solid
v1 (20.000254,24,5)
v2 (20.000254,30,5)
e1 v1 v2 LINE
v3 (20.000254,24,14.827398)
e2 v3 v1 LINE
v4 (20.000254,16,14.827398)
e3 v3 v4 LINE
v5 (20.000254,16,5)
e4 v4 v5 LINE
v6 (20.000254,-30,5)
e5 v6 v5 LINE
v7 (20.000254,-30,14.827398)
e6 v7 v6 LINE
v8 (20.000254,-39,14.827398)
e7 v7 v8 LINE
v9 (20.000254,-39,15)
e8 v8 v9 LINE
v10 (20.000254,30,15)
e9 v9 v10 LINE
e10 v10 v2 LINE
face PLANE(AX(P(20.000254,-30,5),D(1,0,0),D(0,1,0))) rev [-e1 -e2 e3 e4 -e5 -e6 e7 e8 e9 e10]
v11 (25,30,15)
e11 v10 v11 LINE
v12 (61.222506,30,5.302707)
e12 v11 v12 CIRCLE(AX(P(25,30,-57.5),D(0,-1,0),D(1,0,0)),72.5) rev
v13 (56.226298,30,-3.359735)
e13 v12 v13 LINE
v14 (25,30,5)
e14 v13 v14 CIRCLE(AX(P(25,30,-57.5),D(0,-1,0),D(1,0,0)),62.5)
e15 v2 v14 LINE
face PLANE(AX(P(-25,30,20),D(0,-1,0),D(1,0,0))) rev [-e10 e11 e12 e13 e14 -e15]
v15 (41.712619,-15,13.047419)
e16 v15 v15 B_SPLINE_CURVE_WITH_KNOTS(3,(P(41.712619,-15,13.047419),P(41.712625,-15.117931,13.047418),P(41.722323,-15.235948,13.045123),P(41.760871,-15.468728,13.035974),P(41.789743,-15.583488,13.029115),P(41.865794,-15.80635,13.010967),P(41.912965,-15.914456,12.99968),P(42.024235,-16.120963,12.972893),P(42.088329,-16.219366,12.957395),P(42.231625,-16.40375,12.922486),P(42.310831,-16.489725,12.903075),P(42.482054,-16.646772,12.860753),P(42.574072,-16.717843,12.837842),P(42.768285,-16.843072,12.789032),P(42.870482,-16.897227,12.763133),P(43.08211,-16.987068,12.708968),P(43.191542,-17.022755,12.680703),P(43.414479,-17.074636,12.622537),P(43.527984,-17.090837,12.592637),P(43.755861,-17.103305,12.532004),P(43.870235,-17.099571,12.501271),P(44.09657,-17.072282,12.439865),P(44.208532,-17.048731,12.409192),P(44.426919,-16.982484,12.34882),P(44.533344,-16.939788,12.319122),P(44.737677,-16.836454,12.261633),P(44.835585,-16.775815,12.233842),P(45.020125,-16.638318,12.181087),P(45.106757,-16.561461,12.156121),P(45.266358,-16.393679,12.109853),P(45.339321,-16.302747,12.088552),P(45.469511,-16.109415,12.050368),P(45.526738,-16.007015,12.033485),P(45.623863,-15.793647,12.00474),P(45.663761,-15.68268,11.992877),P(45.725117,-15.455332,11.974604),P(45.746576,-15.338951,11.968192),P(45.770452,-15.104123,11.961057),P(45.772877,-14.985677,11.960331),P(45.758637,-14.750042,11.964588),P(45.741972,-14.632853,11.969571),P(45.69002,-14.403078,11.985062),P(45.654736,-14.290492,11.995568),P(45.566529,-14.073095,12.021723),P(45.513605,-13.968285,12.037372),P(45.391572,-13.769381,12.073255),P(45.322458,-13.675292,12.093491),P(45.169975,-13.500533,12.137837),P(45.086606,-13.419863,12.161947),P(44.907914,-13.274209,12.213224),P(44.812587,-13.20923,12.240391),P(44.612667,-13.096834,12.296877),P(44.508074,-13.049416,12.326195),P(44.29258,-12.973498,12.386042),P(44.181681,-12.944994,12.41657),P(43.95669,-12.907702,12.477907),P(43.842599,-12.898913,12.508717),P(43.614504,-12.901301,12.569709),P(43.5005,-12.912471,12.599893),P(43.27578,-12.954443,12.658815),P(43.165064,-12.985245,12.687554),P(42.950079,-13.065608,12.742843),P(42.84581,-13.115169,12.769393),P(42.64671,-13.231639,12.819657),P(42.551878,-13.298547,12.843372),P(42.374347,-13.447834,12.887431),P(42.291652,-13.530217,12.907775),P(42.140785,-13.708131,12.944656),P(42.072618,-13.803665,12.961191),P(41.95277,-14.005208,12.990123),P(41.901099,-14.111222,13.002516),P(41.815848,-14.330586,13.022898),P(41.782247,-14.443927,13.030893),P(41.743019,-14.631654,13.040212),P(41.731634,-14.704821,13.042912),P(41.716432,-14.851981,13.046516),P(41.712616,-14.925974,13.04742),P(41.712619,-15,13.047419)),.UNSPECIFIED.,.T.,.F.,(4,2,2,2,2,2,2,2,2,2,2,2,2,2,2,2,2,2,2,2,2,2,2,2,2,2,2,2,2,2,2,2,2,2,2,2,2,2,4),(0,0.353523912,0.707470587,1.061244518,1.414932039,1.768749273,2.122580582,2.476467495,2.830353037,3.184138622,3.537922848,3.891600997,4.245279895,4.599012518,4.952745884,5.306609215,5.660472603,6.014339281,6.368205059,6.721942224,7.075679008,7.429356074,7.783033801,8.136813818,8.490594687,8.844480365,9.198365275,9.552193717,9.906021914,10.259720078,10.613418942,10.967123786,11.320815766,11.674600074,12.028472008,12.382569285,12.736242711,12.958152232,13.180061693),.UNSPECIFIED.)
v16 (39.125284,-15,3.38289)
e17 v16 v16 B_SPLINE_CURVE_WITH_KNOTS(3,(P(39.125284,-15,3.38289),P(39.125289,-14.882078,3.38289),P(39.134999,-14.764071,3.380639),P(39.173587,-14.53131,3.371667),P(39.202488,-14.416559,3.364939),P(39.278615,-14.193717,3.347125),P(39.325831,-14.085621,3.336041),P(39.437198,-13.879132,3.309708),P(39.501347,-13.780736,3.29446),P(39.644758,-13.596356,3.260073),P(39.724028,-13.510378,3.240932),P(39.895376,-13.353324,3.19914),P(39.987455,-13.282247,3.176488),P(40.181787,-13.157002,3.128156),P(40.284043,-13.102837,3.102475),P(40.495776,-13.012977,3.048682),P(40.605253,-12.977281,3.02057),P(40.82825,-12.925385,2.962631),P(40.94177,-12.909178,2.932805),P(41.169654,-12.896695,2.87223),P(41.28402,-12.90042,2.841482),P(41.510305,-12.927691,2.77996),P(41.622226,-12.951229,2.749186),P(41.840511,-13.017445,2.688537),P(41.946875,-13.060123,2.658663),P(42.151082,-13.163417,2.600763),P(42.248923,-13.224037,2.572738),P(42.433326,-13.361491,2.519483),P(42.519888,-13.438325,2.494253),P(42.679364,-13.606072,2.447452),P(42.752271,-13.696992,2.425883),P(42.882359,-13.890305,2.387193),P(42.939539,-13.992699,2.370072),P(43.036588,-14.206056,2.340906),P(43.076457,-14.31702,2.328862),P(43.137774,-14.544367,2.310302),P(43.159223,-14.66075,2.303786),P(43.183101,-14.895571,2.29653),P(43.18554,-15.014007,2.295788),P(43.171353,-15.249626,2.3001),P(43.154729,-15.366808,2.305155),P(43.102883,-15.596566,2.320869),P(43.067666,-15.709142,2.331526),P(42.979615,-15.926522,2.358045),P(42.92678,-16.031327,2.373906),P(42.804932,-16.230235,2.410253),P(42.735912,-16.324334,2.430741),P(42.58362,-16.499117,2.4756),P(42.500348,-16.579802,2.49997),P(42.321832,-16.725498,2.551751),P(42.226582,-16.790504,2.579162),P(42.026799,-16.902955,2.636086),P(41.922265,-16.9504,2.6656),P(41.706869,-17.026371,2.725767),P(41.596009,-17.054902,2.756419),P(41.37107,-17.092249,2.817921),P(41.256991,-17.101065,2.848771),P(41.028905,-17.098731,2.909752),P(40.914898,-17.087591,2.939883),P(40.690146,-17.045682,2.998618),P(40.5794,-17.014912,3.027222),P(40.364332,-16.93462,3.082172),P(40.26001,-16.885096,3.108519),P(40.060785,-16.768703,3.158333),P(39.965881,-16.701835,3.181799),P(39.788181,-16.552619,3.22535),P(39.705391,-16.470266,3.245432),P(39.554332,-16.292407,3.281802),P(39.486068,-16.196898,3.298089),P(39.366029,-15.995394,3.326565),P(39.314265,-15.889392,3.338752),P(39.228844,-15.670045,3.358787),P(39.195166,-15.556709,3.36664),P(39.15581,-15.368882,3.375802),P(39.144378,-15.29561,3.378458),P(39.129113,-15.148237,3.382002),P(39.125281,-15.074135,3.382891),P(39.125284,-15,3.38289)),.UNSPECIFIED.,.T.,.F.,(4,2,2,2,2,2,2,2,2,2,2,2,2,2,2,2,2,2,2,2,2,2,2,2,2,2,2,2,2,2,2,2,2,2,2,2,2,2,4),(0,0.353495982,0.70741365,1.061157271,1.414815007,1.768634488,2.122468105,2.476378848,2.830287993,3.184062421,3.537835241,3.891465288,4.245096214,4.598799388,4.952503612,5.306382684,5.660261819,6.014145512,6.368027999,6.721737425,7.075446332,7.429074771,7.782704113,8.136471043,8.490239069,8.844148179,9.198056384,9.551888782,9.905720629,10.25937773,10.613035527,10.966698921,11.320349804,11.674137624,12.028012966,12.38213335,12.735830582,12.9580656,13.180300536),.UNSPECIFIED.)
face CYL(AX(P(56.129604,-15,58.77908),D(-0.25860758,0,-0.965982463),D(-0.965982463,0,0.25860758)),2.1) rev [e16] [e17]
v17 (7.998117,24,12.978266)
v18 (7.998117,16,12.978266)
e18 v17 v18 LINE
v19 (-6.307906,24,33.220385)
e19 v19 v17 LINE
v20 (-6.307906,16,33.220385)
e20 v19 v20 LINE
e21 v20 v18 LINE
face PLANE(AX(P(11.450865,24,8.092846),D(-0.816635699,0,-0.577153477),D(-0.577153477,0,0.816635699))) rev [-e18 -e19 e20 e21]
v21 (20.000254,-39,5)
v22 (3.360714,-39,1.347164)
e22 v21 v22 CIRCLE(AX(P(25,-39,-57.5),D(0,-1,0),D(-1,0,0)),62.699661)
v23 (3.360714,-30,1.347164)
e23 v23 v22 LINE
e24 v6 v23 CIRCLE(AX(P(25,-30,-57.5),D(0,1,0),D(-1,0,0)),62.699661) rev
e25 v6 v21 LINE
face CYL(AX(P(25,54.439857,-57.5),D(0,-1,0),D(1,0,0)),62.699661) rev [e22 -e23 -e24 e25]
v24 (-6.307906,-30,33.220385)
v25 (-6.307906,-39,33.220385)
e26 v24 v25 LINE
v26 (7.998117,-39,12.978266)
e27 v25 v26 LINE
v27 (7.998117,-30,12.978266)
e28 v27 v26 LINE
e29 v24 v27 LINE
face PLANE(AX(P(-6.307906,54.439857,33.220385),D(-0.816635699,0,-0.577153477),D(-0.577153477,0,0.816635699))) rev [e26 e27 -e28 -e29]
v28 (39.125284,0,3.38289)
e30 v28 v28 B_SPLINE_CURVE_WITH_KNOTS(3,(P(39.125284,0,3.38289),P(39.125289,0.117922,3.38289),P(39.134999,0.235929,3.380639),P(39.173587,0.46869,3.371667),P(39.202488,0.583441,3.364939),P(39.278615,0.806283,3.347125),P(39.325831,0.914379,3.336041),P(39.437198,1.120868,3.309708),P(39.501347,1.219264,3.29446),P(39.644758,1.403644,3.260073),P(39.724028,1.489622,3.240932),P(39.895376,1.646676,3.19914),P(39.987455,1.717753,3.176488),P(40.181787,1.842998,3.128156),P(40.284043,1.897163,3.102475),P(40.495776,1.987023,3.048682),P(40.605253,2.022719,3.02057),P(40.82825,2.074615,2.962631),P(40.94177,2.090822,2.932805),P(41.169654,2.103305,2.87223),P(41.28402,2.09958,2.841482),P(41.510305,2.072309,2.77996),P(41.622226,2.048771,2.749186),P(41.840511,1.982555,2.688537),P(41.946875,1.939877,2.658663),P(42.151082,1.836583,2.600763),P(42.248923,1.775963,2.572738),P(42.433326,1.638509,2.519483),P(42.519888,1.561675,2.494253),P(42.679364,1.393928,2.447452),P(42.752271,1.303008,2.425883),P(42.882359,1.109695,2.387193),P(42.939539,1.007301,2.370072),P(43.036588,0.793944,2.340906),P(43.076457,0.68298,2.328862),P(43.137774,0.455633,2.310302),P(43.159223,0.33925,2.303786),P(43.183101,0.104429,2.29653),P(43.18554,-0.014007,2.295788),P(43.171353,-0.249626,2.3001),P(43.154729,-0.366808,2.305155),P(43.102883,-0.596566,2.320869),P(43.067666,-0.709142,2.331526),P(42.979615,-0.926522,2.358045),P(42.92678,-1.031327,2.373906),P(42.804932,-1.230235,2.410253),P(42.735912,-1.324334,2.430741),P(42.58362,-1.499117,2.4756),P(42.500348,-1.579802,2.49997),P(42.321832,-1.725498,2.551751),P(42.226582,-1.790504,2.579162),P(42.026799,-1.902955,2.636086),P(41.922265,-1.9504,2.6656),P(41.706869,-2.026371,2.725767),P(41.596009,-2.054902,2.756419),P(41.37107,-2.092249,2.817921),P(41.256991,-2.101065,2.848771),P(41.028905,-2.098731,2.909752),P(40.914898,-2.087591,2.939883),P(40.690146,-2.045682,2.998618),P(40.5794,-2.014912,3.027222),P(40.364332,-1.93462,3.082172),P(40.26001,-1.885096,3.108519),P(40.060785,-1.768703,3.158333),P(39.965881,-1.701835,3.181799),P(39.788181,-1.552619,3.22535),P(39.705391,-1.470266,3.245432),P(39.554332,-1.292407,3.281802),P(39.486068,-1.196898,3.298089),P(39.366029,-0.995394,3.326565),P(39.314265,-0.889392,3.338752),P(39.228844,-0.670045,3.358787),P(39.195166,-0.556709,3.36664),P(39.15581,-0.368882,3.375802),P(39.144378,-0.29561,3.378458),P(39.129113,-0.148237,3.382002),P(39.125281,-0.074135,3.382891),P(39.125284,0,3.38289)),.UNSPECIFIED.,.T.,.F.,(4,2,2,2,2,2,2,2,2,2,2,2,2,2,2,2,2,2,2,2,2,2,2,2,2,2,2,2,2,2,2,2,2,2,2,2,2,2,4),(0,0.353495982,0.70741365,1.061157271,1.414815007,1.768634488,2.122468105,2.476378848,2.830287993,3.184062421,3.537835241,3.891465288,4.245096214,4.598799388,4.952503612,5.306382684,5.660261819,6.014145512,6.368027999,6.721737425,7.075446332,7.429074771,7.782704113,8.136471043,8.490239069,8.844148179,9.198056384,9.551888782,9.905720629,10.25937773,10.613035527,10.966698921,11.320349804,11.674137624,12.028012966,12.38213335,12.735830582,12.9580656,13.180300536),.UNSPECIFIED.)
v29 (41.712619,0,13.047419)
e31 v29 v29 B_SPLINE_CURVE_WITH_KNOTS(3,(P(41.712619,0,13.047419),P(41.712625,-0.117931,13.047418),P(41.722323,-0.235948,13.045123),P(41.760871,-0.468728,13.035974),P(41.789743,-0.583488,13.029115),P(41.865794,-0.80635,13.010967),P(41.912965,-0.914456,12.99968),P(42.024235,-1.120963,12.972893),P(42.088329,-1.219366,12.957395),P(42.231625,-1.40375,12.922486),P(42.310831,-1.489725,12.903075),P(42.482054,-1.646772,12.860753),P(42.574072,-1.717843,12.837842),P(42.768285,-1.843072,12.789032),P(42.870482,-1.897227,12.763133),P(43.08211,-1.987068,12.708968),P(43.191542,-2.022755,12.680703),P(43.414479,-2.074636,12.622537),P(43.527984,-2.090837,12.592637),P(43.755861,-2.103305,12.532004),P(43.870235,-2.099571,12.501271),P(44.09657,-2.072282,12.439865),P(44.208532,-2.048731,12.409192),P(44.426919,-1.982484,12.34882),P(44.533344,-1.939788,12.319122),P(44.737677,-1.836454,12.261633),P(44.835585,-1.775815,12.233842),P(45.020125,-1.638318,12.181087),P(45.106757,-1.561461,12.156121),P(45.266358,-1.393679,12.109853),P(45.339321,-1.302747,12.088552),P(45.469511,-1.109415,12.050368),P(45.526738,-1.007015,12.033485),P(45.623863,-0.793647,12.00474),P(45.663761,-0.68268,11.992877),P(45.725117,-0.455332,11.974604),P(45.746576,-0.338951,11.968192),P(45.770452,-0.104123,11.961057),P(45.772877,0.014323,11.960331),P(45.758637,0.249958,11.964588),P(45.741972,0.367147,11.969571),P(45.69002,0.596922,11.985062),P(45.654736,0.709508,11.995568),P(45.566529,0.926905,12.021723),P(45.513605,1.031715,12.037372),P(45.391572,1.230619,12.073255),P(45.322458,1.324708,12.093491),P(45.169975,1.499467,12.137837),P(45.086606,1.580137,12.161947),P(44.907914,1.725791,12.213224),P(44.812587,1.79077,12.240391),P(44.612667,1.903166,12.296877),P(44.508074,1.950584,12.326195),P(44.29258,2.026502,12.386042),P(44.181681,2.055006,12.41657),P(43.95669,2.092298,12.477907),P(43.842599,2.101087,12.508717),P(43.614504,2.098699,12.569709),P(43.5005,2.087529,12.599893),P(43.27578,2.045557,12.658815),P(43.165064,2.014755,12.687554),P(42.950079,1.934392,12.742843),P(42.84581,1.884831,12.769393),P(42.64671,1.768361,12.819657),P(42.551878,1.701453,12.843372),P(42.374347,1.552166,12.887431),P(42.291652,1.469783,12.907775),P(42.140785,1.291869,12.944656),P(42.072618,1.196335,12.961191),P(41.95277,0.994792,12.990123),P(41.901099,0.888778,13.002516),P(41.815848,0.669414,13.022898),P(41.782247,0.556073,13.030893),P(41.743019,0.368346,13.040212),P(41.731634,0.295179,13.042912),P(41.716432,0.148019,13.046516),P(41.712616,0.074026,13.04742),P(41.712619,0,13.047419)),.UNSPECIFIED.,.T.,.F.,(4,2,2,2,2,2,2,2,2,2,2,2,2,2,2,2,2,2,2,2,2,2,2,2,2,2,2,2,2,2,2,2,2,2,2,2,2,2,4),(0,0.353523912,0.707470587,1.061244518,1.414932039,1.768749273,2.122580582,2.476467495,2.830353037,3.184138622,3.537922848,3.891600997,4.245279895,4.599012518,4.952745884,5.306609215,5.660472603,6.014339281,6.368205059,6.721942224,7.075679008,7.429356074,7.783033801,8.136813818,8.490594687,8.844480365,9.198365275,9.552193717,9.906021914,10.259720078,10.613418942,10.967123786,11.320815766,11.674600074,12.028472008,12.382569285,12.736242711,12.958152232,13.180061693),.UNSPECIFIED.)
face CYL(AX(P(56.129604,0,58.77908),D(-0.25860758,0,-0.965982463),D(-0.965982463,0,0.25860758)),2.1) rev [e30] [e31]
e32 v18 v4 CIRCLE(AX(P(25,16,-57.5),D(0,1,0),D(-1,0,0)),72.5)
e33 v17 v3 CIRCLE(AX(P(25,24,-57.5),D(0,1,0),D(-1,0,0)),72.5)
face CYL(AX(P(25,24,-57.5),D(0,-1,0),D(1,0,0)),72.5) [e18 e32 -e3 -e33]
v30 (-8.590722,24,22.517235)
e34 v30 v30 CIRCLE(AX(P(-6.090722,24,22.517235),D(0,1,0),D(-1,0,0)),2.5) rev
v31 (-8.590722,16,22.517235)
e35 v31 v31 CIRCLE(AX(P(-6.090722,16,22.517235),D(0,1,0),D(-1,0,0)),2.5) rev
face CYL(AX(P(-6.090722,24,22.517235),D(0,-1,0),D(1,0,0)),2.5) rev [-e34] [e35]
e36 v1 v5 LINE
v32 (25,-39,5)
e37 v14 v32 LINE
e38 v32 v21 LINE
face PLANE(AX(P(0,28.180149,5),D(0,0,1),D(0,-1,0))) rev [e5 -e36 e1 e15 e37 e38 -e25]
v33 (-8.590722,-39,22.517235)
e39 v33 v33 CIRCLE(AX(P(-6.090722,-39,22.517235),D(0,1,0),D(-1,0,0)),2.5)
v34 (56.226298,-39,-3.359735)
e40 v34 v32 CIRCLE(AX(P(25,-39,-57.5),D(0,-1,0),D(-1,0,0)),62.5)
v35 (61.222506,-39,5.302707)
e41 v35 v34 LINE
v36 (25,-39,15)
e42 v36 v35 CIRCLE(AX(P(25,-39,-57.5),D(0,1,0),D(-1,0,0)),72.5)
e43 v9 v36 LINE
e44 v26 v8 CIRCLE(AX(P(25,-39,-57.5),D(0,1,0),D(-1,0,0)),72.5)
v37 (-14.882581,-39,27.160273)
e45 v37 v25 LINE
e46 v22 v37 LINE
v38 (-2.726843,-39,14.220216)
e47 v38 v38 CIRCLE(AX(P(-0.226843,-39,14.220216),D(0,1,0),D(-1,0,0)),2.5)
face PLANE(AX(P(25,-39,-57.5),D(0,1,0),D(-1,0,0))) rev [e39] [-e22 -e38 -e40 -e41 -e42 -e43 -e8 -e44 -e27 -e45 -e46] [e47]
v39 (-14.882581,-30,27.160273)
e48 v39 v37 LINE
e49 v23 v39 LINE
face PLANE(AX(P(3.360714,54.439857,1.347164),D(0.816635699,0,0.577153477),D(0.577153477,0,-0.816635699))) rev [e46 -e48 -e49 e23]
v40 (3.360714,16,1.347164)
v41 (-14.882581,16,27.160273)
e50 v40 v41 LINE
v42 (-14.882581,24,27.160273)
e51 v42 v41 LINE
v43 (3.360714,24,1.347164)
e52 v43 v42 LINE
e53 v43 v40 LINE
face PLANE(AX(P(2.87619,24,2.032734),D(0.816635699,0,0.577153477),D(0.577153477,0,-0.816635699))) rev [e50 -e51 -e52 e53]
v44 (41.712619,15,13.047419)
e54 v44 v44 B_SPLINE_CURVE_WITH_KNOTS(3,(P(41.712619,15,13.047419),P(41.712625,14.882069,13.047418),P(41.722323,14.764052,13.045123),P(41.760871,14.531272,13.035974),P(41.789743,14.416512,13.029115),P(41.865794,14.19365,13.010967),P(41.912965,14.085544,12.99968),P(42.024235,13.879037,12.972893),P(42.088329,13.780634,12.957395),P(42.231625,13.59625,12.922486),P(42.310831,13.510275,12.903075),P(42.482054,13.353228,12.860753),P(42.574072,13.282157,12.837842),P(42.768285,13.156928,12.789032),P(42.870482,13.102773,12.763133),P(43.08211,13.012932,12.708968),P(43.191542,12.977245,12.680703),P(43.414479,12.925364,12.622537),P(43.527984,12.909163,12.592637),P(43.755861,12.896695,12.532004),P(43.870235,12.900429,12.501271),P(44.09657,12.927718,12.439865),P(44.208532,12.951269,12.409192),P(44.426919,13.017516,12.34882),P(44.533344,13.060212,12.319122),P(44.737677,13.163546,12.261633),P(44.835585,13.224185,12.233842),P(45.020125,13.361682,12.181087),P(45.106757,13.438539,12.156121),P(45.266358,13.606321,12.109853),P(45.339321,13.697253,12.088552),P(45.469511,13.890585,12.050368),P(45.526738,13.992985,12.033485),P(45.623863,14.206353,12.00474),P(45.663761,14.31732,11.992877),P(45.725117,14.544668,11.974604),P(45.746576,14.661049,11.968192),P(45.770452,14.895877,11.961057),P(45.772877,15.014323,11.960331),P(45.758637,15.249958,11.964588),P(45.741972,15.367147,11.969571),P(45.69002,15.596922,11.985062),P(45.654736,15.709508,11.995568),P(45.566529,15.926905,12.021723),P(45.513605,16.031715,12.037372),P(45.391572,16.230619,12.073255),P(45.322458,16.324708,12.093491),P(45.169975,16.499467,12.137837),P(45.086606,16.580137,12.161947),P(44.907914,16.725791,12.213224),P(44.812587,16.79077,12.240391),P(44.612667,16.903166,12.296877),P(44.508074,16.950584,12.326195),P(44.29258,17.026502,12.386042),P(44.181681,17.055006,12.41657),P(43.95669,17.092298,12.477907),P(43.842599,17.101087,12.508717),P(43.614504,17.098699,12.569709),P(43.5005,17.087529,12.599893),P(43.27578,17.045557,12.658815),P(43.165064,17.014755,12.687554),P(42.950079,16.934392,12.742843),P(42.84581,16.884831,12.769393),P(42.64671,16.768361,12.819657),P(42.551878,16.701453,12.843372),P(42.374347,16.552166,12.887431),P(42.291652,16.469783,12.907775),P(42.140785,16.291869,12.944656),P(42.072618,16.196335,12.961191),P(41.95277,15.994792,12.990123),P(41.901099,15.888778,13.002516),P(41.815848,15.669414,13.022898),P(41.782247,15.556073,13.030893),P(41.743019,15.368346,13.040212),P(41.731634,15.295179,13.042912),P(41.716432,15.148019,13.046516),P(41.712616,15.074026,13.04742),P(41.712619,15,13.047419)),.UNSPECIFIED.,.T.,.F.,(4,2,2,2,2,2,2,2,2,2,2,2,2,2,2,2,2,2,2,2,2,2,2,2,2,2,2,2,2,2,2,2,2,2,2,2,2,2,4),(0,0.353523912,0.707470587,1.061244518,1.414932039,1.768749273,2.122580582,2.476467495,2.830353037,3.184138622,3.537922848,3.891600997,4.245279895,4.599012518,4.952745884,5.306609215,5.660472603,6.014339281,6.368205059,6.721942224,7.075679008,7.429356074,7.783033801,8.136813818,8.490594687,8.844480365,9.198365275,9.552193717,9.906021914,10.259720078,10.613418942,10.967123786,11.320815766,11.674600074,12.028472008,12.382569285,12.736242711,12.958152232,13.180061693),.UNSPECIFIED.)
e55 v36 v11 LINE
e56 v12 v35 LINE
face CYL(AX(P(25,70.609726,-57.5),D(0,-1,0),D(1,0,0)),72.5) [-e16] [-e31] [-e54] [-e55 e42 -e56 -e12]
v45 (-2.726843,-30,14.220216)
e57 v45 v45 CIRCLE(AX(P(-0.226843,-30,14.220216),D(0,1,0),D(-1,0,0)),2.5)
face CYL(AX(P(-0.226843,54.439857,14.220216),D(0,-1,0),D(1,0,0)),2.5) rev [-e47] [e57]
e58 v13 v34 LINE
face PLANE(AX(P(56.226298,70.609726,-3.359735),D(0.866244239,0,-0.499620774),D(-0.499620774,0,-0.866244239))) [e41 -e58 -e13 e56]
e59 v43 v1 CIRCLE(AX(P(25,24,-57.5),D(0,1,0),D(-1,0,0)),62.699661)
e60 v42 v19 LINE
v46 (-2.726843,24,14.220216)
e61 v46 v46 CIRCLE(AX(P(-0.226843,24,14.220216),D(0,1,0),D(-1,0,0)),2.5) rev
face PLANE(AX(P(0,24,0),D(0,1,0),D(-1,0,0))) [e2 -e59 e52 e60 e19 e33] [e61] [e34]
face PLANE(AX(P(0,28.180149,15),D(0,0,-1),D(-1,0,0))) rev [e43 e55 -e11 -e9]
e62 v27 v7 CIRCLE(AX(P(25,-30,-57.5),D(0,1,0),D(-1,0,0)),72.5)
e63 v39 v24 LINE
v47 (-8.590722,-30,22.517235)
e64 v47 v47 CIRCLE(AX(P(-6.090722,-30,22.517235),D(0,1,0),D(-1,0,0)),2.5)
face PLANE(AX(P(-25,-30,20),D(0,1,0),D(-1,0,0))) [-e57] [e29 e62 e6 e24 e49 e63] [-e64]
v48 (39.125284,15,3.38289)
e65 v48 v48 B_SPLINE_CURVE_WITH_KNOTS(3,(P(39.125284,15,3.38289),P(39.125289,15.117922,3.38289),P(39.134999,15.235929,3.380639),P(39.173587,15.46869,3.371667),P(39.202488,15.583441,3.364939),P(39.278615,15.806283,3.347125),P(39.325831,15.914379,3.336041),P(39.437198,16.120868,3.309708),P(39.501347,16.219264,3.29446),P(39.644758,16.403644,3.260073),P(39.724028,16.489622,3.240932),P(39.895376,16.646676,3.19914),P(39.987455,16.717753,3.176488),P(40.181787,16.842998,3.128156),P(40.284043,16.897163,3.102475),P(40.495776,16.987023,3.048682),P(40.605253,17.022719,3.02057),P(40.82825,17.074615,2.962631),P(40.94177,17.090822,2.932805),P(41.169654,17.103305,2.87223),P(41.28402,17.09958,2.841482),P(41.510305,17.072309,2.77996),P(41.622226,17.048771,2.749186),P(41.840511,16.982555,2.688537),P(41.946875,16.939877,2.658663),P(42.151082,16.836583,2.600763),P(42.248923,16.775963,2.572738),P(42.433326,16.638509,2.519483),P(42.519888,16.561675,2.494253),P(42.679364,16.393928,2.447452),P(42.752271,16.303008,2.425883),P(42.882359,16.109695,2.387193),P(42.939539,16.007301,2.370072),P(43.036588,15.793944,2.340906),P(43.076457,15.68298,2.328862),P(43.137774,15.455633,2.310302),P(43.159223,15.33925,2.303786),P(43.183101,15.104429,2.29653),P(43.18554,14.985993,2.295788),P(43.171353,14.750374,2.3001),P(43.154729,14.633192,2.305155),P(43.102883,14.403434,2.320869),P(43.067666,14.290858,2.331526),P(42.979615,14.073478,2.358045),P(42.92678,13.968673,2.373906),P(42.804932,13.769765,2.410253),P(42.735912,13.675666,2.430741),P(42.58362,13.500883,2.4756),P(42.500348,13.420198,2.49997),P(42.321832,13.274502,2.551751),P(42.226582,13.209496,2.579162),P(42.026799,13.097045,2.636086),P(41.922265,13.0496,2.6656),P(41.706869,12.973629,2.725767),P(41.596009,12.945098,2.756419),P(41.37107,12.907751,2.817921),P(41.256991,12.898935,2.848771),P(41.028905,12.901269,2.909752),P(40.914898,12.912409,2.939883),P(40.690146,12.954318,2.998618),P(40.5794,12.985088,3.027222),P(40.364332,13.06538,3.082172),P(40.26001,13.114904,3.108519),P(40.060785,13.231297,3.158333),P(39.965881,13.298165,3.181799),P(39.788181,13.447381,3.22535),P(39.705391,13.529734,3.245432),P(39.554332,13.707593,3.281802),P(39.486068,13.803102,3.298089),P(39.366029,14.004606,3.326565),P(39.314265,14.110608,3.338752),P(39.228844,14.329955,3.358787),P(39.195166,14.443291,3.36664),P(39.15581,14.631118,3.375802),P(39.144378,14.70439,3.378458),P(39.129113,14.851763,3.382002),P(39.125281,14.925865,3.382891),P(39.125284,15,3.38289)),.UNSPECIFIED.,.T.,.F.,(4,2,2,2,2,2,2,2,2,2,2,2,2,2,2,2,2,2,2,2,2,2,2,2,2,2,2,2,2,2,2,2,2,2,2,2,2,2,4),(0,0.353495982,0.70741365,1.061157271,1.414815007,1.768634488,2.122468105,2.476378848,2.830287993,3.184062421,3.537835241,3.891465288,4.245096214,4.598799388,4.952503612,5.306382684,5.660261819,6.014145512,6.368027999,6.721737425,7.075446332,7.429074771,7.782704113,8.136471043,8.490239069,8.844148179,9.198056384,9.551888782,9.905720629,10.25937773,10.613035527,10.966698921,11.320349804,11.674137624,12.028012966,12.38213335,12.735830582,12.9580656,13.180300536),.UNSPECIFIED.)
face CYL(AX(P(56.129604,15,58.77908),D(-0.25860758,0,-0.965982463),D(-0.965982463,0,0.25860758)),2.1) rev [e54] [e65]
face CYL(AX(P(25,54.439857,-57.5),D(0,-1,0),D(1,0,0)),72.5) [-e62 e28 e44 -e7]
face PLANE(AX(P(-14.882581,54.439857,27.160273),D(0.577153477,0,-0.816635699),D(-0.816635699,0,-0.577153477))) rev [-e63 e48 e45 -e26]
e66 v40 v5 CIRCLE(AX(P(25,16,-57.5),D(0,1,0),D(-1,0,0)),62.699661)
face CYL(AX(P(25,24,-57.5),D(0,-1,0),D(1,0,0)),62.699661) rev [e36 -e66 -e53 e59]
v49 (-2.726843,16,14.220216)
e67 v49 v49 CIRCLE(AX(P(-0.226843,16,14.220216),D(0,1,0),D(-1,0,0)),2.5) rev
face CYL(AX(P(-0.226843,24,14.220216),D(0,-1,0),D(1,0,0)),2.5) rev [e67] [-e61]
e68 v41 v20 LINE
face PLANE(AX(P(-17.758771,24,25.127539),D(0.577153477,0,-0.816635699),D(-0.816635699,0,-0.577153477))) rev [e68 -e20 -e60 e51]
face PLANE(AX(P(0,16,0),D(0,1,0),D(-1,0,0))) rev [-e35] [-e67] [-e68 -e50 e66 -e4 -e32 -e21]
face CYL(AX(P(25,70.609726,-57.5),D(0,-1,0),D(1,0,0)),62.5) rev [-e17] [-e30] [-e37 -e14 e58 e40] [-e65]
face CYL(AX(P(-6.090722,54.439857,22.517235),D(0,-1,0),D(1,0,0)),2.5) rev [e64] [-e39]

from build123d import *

# Parameters (mm, degrees)
BOSS_EXTRUDE2_DEPTH = 20
FILLET1_RADIUS      = 10
FILLET1_LENGTH      = 5
FILLET2_RADIUS      = 10
FILLET2_LENGTH      = 5
SKETCH5_R           = 1
SKETCH5_R_2         = 5.5
CUT_EXTRUDE5_DEPTH  = 69.007352544
CUT_EXTRUDE7_DEPTH  = 25
FILLET5_R           = 10
BOSS_EXTRUDE5_DEPTH = 60
SKETCH13_R          = 2.1
CUT_EXTRUDE8_DEPTH  = 60
CUT_EXTRUDE9_DEPTH  = 60
CUT_EXTRUDE10_DEPTH = 60
SKETCH17_R          = 2.5
BOSS_EXTRUDE6_DEPTH = 8
SKETCH18_R          = 2.5
BOSS_EXTRUDE7_DEPTH = 9


with BuildPart() as part:
    # Sketch1 → Boss-Extrude2 (new body)
    with BuildSketch(Plane.XY):
        Polygon((-25, 30), (25, 30), (25, -30), (-25, -30), (-25, -25), (-20, -25), (20, -25), (20, 25), (-20, 25), (-25, 25), align=None)
    extrude(amount=BOSS_EXTRUDE2_DEPTH)

    # Fillet1: full round fillet: the end face becomes a half cylinder, R = half its width
    fillet1_face = Plane((-25, 27.5, 10), x_dir=(0, -1, 0), z_dir=(-1, 0, 0))  # on the end face: x along it, z out of the body
    fillet1_slab = fillet1_face.offset(-FILLET1_RADIUS / 2) * Box(FILLET1_LENGTH, 2 * FILLET1_RADIUS, FILLET1_RADIUS, mode=Mode.PRIVATE)  # the body's end, R deep
    fillet1_round = Plane((-15, 27.5, 10), x_dir=(-1, 0, 0), z_dir=(0, -1, 0)) * Cylinder(FILLET1_RADIUS, FILLET1_LENGTH, mode=Mode.PRIVATE)  # its axis R under the face
    add(fillet1_slab - fillet1_round, mode=Mode.SUBTRACT)

    # Fillet2: full round fillet: the end face becomes a half cylinder, R = half its width
    fillet2_face = Plane((-25, -27.5, 10), x_dir=(0, -1, 0), z_dir=(-1, 0, 0))  # on the end face: x along it, z out of the body
    fillet2_slab = fillet2_face.offset(-FILLET2_RADIUS / 2) * Box(FILLET2_LENGTH, 2 * FILLET2_RADIUS, FILLET2_RADIUS, mode=Mode.PRIVATE)  # the body's end, R deep
    fillet2_round = Plane((-15, -27.5, 10), x_dir=(-1, 0, 0), z_dir=(0, -1, 0)) * Cylinder(FILLET2_RADIUS, FILLET2_LENGTH, mode=Mode.PRIVATE)  # its axis R under the face
    add(fillet2_slab - fillet2_round, mode=Mode.SUBTRACT)

    # Sketch5 → Cut-Extrude5 (cut, through all)
    with BuildSketch(Plane(origin=(0, 30, 0), x_dir=(1, 0, 0), z_dir=(0, 1, 0))):
        with Locations(Location((-15, -3, 0), (0, 0, 180))):
            Circle(SKETCH5_R)
        with Locations(Location((-22, -10, 0), (0, 0, 180))):
            Circle(SKETCH5_R)
        with Locations(Location((-15, -17, 0), (0, 0, 180))):
            Circle(SKETCH5_R)
        with Locations(Location((-8, -10, 0), (0, 0, 180))):
            Circle(SKETCH5_R)
        with Locations(Location((-15, -10, 0), (0, 0, 180))):
            Circle(SKETCH5_R_2)
    extrude(amount=-CUT_EXTRUDE5_DEPTH, mode=Mode.SUBTRACT)

    # Sketch10 → Cut-Extrude7 (cut)
    with BuildSketch(Plane(origin=(25, 0, 0), x_dir=(0, 0, -1), z_dir=(1, 0, 0))):
        Polygon((-15, 28.180148829), (-15, -28.180148829), (-15, -30), (-20, -30), (-20, 30), (-15, 30), align=None)
        Polygon((-5, 28.180148829), (-5, -28.180148829), (-5, -30), (0, -30), (0, 30), (-5, 30), align=None)
    extrude(amount=-CUT_EXTRUDE7_DEPTH, mode=Mode.SUBTRACT)

    # Fillet5
    # the kernel refuses this fillet: 10 mm, written as the material it adds along each edge
    with BuildSketch(Plane(origin=(0, 25, 15), x_dir=(1, 0, 0), z_dir=(0, 1, 0)), Plane(origin=(0, -30, 15), x_dir=(1, 0, 0), z_dir=(0, 1, 0)), Plane(origin=(0, -25, 5), x_dir=(1, 0, 0), z_dir=(0, -1, 0))) as fillet5_piece_1:
        with BuildLine():
            CenterArc((8.660254038, -10), FILLET5_R, 90, 60)
            Line((0, -5), (-0.173205081, -4.9))
            ThreePointArc((-0.173205081, -4.9), (-0.2, -2.5), (-0.2, 0))
            Line((-0.2, 0), (0, 0.2))
            Line((0, 0.2), (8.660254038, 0.2))
            Line((8.660254038, 0.2), (8.660254038, 0))
        make_face()
    extrude(amount=5)
    with BuildSketch(Plane(origin=(0, 30, 5), x_dir=(0, 0, -1), z_dir=(0, -1, 0))) as fillet5_piece_2:
        with BuildLine():
            CenterArc((10, 8.660254038), FILLET5_R, 180, 60)
            Line((0, 8.660254038), (-0.2, 8.660254038))
            Line((-0.2, 8.660254038), (-0.2, 0))
            Line((-0.2, 0), (0, -0.2))
            ThreePointArc((0, -0.2), (2.5, -0.2), (4.9, -0.173205081))
            Line((4.9, -0.173205081), (5, 0))
        make_face()
    extrude(amount=5)

    # Sketch12 → Boss-Extrude5 (add)
    with BuildSketch(Plane.XZ.offset(30)):
        with BuildLine():
            Line((56.226298398, -3.359735054), (61.222506141, 5.302707337))
            ThreePointArc((61.222506141, 5.302707337), (43.74904955, 12.533728595), (25, 15))
            Line((25, 15), (25, 5))
            ThreePointArc((25, 5), (41.16297375, 2.873903962), (56.226298398, -3.359735054))
        make_face()
    extrude(amount=-BOSS_EXTRUDE5_DEPTH)

    # Sketch13 → Cut-Extrude8 (cut)
    with BuildSketch(Plane(origin=(2.920998947, 0, 10.910870277), x_dir=(-0.9659824633840055, 0, 0.2586075800021504), z_dir=(-0.2586075800021504, 0, -0.9659824633840055))):
        with Locations((-39.019497435, 15)):
            Circle(SKETCH13_R)
        with Locations((-39.019497435, 0)):
            Circle(SKETCH13_R)
        with Locations((-39.019497435, -15)):
            Circle(SKETCH13_R)
    extrude(amount=-CUT_EXTRUDE8_DEPTH, mode=Mode.SUBTRACT)

    # Sketch15 → Cut-Extrude9 (cut)
    with BuildSketch(Plane(origin=(0, 30, 0), x_dir=(1, 0, 0), z_dir=(0, 1, 0))):
        with BuildLine():
            Line((8.660254038, -5), (8.660254038, -15))
            ThreePointArc((8.660254038, -15), (-39.182795974, -10), (8.660254038, -5))
        make_face()
    extrude(amount=-CUT_EXTRUDE9_DEPTH, mode=Mode.SUBTRACT)

    # Sketch16 → Cut-Extrude10 (cut)
    with BuildSketch(Plane(origin=(0, 30, 0), x_dir=(1, 0, 0), z_dir=(0, 1, 0))):
        Polygon((-6.307906019, -33.220384693), (8.660254038, -15), (20.000254038, -15), (20.000254038, -5), (8.660254038, -5), (3.496355525, -1.350438774), (-14.790578774, -27.225295226), align=None)
    extrude(amount=-CUT_EXTRUDE10_DEPTH, mode=Mode.SUBTRACT)

    # Sketch17 → Boss-Extrude6 (add)
    # profile 1 of 2: a face of its own
    with BuildSketch(Plane(origin=(0, 16, 0), x_dir=(1, 0, 0), z_dir=(0, 1, 0))):
        Polygon((2.432023453, -2.661202229), (-1.062108246, -7.605177784), (-12.605177784, -23.937891754), (-14.882580853, -27.160273185), (-8.757813114, -31.488924262), (-6.307906019, -33.220384693), (7.998117102, -12.978265997), (11.006698288, -8.721313737), align=None)
        with Locations(Location((-6.090722034, -22.517234763, 0), (0, 0, 180))):
            Circle(SKETCH17_R, mode=Mode.SUBTRACT)
        with Locations(Location((-0.226842709, -14.220216066, 0), (0, 0, 180))):
            Circle(SKETCH17_R, mode=Mode.SUBTRACT)
    # profile 2 of 2: a face of its own
    with BuildSketch(Plane(origin=(0, 16, 0), x_dir=(1, 0, 0), z_dir=(0, 1, 0))):
        with BuildLine():
            Line((3.360713643, -1.347164296), (2.432023453, -2.661202229))
            Line((2.432023453, -2.661202229), (11.006698288, -8.721313737))
            Line((11.006698288, -8.721313737), (7.998117102, -12.978265997))
            ThreePointArc((7.998117102, -12.978265997), (13.960401245, -14.154569005), (20.000254038, -14.827398269))
            Line((20.000254038, -14.827398269), (20.000254038, -5))
            ThreePointArc((20.000254038, -5), (11.555844657, -3.741343444), (3.360713643, -1.347164296))
        make_face()
    extrude(amount=BOSS_EXTRUDE6_DEPTH)

    # Sketch18 → Boss-Extrude7 (add)
    with BuildSketch(Plane(origin=(0, -39, 0), x_dir=(1, 0, 0), z_dir=(0, 1, 0))):
        with BuildLine():
            Line((3.360713643, -1.347164296), (-14.882580853, -27.160273185))
            Line((-14.882580853, -27.160273185), (-6.307906019, -33.220384693))
            Line((-6.307906019, -33.220384693), (7.998117102, -12.978265997))
            ThreePointArc((7.998117102, -12.978265997), (13.960401245, -14.154569005), (20.000254038, -14.827398269))
            Line((20.000254038, -14.827398269), (20.000254038, -15))
            Line((20.000254038, -15), (25, -15))
            ThreePointArc((25, -15), (43.74904955, -12.533728595), (61.222506141, -5.302707337))
            Line((61.222506141, -5.302707337), (56.226298398, 3.359735054))
            ThreePointArc((56.226298398, 3.359735054), (41.16297375, -2.873903962), (25, -5))
            Line((25, -5), (20.000254038, -5))
            ThreePointArc((20.000254038, -5), (11.555844657, -3.741343444), (3.360713643, -1.347164296))
        make_face()
        with Locations(Location((-6.090722034, -22.517234763, 0), (0, 0, 180))):
            Circle(SKETCH18_R, mode=Mode.SUBTRACT)
        with Locations(Location((-0.226842709, -14.220216066, 0), (0, 0, 180))):
            Circle(SKETCH18_R, mode=Mode.SUBTRACT)
    extrude(amount=BOSS_EXTRUDE7_DEPTH)


solid = part.part
